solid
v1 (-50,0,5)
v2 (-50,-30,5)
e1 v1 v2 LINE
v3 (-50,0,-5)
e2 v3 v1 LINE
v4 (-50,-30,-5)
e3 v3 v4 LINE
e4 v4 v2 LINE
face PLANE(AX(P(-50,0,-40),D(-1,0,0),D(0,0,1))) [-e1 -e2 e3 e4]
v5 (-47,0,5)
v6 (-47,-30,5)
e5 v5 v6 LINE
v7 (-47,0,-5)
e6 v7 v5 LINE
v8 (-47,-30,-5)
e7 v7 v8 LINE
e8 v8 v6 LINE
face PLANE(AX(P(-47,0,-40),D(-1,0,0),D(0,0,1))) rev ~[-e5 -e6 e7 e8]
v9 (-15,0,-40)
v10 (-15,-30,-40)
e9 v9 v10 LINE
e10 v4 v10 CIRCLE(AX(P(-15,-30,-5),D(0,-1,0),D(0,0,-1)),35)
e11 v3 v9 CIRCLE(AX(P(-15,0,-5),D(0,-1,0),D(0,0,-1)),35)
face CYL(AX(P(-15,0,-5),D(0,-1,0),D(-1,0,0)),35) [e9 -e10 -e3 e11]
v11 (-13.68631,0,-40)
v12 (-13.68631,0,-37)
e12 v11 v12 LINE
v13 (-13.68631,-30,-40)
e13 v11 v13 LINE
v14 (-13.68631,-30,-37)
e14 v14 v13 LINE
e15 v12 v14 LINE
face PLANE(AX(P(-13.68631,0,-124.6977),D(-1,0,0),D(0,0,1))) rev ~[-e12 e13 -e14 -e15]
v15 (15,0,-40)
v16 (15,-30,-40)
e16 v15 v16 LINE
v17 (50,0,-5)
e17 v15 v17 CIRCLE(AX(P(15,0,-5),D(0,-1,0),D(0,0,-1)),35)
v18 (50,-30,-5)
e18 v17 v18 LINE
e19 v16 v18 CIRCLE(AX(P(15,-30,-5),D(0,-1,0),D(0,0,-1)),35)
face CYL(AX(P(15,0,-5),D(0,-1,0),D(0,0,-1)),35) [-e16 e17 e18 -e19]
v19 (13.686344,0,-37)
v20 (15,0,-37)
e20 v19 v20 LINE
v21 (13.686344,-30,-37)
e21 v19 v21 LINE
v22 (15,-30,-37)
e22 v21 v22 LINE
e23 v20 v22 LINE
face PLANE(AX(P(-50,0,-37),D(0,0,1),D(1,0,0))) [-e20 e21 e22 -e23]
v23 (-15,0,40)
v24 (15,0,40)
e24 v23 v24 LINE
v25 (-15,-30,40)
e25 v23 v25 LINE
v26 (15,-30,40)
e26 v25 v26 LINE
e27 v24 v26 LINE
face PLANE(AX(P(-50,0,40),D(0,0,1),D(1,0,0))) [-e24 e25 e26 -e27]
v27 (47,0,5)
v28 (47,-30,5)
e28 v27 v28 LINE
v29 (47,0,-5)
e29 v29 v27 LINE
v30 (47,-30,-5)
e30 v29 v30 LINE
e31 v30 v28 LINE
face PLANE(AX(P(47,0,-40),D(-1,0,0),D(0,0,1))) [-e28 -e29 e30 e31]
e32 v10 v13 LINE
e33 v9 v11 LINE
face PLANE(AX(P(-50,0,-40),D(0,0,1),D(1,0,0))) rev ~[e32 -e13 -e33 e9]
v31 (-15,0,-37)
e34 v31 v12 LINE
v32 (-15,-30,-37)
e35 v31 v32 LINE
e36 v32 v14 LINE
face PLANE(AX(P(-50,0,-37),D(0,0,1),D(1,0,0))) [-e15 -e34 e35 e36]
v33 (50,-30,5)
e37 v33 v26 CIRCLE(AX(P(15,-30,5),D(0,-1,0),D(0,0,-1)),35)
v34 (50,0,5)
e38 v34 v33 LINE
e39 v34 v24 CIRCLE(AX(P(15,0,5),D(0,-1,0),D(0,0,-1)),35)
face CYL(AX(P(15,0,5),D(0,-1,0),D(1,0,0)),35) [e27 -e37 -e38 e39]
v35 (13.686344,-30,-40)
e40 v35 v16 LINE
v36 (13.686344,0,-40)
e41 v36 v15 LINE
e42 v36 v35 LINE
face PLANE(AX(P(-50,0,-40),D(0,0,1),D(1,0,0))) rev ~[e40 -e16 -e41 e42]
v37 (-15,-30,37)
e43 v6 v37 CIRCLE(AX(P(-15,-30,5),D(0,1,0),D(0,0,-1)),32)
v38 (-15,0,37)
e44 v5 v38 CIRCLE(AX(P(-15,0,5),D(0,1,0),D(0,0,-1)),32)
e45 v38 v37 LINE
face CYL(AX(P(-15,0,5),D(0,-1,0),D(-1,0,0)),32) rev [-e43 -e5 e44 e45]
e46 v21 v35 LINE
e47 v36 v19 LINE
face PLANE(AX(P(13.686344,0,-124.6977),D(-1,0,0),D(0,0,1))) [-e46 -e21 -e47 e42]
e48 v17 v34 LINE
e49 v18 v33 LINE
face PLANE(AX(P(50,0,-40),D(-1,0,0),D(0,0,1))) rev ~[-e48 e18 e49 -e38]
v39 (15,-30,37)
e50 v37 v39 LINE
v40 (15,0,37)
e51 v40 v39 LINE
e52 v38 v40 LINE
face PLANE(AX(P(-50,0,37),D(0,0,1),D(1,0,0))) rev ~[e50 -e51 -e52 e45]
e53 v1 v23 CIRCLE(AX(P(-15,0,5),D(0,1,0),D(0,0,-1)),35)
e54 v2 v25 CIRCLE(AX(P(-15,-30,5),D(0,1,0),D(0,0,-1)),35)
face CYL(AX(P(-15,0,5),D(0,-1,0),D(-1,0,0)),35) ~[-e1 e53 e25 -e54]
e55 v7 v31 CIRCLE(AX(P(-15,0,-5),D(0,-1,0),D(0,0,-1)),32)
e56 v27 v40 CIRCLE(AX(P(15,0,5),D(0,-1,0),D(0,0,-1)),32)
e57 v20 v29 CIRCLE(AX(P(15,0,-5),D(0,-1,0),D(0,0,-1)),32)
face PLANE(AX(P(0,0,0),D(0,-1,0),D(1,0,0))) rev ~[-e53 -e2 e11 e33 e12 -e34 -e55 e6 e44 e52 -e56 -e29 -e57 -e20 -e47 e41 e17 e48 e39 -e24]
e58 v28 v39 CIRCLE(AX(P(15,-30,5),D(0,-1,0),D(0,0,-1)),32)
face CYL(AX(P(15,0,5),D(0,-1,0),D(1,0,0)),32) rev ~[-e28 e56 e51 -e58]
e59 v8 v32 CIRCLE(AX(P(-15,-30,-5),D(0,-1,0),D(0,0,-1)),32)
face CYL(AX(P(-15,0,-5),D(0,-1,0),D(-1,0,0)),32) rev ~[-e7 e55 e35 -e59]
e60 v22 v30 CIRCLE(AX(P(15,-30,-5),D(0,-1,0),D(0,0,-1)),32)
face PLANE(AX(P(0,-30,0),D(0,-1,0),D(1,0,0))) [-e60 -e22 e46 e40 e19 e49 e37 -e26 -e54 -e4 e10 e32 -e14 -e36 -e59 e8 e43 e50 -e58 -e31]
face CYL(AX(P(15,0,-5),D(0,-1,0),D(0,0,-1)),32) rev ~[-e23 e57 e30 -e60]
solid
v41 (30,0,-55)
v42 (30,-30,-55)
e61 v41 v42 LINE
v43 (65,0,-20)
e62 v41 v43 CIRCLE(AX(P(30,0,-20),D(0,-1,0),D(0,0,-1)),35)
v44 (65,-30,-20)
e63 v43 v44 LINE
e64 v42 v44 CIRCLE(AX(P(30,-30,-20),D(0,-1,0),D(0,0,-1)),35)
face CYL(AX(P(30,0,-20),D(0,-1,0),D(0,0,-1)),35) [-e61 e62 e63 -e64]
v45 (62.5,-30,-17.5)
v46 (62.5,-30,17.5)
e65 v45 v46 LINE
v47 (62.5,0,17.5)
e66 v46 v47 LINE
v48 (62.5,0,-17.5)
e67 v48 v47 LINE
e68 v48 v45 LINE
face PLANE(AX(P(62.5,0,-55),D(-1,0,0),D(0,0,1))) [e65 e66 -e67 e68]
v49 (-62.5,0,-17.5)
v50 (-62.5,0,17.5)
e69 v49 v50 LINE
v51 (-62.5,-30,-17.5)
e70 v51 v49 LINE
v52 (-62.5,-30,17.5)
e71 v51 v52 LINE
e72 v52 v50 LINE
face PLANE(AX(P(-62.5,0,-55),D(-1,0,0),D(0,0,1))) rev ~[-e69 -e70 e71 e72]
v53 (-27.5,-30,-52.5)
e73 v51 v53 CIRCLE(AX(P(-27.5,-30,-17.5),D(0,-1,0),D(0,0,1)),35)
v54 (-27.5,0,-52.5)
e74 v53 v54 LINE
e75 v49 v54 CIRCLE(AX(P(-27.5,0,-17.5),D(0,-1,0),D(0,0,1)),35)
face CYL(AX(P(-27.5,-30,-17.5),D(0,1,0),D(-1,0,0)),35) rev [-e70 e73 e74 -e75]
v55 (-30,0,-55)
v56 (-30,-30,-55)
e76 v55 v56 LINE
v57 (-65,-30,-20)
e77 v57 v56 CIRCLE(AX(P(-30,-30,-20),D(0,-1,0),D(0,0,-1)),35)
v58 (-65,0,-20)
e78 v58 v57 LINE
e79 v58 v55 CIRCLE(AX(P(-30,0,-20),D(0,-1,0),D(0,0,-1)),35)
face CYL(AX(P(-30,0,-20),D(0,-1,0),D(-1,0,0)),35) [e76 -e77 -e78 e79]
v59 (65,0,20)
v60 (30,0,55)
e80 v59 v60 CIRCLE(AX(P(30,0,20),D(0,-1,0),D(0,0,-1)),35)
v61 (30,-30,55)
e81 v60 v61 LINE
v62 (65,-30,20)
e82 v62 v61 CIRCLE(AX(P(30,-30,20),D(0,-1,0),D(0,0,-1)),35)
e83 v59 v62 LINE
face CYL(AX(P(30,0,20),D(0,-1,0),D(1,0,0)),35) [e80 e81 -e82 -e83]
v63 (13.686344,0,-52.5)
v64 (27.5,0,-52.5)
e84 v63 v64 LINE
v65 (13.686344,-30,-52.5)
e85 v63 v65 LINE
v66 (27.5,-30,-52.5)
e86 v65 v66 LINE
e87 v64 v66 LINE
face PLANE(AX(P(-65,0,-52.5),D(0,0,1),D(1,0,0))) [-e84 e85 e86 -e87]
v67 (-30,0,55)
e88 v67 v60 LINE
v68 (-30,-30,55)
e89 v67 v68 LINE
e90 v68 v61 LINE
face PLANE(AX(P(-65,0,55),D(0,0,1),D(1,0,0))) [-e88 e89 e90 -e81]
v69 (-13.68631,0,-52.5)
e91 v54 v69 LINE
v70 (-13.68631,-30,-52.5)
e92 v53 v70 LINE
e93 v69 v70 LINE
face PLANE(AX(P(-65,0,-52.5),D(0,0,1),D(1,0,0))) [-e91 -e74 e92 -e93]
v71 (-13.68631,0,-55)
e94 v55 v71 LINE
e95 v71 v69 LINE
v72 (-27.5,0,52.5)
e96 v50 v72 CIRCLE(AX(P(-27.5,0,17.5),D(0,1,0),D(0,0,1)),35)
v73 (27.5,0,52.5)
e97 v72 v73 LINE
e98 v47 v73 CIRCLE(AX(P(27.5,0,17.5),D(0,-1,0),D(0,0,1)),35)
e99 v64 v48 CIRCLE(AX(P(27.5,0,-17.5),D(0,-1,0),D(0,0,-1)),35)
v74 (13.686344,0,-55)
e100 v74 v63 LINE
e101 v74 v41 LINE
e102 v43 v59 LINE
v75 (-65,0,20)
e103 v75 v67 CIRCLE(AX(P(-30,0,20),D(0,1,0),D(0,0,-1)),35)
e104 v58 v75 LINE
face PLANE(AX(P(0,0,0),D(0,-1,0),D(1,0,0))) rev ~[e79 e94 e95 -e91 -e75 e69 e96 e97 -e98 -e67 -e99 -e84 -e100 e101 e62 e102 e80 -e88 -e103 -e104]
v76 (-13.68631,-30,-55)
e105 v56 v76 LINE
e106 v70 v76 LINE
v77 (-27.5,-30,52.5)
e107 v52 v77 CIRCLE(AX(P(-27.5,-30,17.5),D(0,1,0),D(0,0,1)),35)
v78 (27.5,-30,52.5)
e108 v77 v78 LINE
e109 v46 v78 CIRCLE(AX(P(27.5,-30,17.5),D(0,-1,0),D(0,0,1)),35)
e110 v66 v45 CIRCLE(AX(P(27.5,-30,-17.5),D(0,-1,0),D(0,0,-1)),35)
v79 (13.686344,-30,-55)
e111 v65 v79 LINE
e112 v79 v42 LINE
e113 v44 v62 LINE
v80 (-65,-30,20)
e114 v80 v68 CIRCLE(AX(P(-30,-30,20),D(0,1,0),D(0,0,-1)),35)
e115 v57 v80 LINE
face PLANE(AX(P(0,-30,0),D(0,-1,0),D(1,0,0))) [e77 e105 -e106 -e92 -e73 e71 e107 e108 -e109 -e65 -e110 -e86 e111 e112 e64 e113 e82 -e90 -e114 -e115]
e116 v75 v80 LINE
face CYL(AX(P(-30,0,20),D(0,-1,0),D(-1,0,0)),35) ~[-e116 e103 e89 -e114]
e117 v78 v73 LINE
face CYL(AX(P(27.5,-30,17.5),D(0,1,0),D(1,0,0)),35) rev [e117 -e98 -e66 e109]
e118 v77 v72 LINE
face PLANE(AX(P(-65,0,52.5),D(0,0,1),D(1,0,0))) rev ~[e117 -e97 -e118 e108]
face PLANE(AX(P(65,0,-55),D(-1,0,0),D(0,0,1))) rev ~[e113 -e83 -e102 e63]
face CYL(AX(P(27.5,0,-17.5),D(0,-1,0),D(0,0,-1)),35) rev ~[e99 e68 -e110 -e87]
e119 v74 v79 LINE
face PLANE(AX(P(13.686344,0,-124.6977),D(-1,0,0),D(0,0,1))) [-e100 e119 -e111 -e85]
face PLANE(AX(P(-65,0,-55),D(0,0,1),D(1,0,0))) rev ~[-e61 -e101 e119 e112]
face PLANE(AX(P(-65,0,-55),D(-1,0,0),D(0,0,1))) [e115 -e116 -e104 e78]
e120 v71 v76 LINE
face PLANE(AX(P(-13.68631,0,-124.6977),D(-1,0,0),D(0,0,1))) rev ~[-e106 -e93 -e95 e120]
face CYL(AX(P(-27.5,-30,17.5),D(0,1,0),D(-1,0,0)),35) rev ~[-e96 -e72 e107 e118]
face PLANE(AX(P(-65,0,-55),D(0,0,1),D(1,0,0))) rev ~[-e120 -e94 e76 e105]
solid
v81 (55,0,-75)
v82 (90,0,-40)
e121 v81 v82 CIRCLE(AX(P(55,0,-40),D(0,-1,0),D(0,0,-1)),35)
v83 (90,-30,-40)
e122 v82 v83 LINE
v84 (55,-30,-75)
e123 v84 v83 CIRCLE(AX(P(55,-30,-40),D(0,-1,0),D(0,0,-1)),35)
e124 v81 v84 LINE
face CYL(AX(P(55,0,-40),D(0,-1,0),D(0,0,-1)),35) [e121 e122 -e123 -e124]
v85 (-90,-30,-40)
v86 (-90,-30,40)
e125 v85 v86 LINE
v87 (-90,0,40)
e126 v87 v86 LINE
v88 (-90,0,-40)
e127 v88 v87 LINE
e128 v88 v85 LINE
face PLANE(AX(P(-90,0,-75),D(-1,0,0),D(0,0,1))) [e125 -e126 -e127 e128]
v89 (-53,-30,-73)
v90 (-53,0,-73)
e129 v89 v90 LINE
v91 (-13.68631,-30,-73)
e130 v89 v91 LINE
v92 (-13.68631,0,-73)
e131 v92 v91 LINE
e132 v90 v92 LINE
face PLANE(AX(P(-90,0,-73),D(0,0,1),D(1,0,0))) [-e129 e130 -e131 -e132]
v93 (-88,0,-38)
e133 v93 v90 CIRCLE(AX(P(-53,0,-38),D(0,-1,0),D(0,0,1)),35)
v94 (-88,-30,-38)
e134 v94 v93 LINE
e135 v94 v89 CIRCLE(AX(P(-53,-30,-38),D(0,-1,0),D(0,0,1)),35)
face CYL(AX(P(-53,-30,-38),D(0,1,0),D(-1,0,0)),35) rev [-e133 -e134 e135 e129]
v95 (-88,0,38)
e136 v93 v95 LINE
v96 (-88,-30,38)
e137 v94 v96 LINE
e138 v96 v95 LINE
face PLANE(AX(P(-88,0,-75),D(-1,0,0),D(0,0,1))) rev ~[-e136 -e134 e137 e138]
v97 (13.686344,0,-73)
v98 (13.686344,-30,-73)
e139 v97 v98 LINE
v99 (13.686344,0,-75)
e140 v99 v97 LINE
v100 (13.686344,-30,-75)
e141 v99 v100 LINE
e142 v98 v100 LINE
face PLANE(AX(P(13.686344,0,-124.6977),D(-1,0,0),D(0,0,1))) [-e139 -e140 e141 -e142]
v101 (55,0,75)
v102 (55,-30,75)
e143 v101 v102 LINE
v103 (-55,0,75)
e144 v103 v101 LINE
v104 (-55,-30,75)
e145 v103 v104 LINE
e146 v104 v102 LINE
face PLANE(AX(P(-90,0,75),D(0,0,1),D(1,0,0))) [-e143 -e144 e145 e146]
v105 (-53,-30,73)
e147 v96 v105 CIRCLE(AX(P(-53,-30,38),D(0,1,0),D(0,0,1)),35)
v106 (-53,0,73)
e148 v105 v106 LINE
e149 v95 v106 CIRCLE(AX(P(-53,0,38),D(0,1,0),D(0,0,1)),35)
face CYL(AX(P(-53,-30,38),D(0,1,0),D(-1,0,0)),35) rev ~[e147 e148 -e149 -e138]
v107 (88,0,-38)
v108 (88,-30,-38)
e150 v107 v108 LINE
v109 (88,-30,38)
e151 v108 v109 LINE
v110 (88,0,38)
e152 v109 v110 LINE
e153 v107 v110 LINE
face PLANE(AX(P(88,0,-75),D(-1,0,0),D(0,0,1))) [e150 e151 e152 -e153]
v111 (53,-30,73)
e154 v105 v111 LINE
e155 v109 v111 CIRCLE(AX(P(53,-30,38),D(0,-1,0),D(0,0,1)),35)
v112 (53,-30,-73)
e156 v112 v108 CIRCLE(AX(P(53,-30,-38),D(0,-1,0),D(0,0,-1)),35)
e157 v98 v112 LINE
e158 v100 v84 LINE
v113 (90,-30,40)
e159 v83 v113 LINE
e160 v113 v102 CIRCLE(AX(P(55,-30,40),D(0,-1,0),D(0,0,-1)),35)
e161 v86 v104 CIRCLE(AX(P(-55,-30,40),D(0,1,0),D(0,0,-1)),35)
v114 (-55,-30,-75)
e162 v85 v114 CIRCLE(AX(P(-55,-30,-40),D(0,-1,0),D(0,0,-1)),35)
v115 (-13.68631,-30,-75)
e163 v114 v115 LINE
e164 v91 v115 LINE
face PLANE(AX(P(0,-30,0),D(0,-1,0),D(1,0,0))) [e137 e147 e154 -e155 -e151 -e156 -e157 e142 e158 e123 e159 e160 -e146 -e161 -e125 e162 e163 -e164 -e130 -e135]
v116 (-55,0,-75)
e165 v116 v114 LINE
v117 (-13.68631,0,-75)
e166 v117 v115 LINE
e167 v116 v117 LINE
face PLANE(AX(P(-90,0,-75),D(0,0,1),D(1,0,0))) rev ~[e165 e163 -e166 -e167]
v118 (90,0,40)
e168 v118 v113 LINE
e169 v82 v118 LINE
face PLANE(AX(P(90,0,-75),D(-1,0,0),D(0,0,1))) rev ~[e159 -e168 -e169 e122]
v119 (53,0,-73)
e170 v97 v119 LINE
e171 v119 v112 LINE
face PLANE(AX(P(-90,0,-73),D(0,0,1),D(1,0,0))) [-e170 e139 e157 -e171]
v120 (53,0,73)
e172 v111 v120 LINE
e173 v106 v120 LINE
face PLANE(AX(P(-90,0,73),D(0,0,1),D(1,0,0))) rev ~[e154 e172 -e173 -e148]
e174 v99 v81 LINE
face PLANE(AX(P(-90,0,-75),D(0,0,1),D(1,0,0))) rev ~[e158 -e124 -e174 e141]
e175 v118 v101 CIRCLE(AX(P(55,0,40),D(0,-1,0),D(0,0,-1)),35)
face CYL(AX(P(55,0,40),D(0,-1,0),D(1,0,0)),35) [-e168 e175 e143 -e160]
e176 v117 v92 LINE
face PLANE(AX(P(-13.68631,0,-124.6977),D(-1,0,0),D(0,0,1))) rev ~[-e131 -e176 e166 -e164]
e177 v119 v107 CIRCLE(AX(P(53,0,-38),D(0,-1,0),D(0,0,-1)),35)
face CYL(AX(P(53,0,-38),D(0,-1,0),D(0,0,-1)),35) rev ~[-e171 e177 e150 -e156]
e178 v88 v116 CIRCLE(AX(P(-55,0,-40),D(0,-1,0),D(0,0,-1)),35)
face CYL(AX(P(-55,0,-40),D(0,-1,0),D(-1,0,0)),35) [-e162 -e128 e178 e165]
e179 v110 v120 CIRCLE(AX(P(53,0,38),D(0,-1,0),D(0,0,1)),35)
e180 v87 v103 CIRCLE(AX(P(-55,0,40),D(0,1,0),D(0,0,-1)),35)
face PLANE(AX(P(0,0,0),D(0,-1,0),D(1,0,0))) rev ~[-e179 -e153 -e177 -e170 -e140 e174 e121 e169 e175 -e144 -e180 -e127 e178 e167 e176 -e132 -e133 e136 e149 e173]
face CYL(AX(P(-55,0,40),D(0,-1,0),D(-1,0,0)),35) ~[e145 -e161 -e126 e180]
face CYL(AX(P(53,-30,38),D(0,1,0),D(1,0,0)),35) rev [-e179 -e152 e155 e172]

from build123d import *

# Parameters (mm, degrees)
F0_W      = 180
F0_H      = 150
F1_DEPTH  = 30
F2_T      = -2
F3_W      = 130
F3_H      = 110
F4_DEPTH  = 30
F5_T      = -2.5
F6_W      = 100
F6_H      = 80
F7_DEPTH  = 30
F8_R      = 35
F8_2_R    = 35
F8_3_R    = 35
F9_T      = -3
F10_W     = 27.3726535961
F10_H     = 91.242223978
F11_DEPTH = 30.001


with BuildPart() as f1:
    # F0 (on Front) → F1 (new body)
    with BuildSketch(Plane.XZ):
        Rectangle(F0_W, F0_H)
    extrude(amount=F1_DEPTH)

    # F2
    f2_openings = [f1.faces().sort_by_distance(p)[0] for p in [
        (0, -30, 0),
        (0, 0, 0),
    ]]
    offset(amount=F2_T, openings=f2_openings)

    # F8
    f8_edges = [f1.edges().sort_by_distance(p)[0] for p in [
        (-88, -15, 73),
        (-90, -15, 75),
        (90, -15, 75),
        (88, -15, 73),
        (88, -15, -73),
        (90, -15, -75),
        (-88, -15, -73),
        (-90, -15, -75),
    ]]
    fillet(f8_edges, radius=F8_R)


with BuildPart() as f4:
    # F3 (on face) → F4 (new body)
    with BuildSketch(Plane.XZ):
        Rectangle(F3_W, F3_H)
    extrude(amount=F4_DEPTH)

    # F5
    f5_openings = [f4.faces().sort_by_distance(p)[0] for p in [
        (0, -30, 0),
        (0, 0, 0),
    ]]
    offset(amount=F5_T, openings=f5_openings)

    # F8#2
    f8_2_edges = [f4.edges().sort_by_distance(p)[0] for p in [
        (-62.5, -15, 52.5),
        (-65, -15, 55),
        (-62.5, -15, -52.5),
        (-65, -15, -55),
        (62.5, -15, -52.5),
        (62.5, -15, 52.5),
        (65, -15, -55),
        (65, -15, 55),
    ]]
    fillet(f8_2_edges, radius=F8_2_R)


with BuildPart() as f7:
    # F6 (on face) → F7 (new body)
    with BuildSketch(Plane.XZ):
        Rectangle(F6_W, F6_H)
    extrude(amount=F7_DEPTH)

    # F8#3
    f8_3_edges = [f7.edges().sort_by_distance(p)[0] for p in [
        (50, -15, 40),
        (-50, -15, 40),
        (-50, -15, -40),
        (50, -15, -40),
    ]]
    fillet(f8_3_edges, radius=F8_3_R)

    # F9
    f9_openings = [f7.faces().sort_by_distance(p)[0] for p in [
        (0, -30, 0),
        (0, 0, 0),
    ]]
    offset(amount=F9_T, openings=f9_openings)


with BuildPart() as f11_tool:
    # F10 (on face) → F11 (new body, through all)
    with BuildSketch(Plane.XZ):
        with Locations((1.72295e-05, -79.0765881538)):
            Rectangle(F10_W, F10_H)
    extrude(amount=F11_DEPTH)


with BuildPart() as f1_1:
    add(f1.part)

    # F11: cut by f11_tool
    add(f11_tool.part, mode=Mode.SUBTRACT)


with BuildPart() as f4_1:
    add(f4.part)

    # F11: cut by f11_tool
    add(f11_tool.part, mode=Mode.SUBTRACT)


with BuildPart() as f7_1:
    add(f7.part)

    # F11: cut by f11_tool
    add(f11_tool.part, mode=Mode.SUBTRACT)


solid = Compound([f1_1.part, f4_1.part, f7_1.part])
